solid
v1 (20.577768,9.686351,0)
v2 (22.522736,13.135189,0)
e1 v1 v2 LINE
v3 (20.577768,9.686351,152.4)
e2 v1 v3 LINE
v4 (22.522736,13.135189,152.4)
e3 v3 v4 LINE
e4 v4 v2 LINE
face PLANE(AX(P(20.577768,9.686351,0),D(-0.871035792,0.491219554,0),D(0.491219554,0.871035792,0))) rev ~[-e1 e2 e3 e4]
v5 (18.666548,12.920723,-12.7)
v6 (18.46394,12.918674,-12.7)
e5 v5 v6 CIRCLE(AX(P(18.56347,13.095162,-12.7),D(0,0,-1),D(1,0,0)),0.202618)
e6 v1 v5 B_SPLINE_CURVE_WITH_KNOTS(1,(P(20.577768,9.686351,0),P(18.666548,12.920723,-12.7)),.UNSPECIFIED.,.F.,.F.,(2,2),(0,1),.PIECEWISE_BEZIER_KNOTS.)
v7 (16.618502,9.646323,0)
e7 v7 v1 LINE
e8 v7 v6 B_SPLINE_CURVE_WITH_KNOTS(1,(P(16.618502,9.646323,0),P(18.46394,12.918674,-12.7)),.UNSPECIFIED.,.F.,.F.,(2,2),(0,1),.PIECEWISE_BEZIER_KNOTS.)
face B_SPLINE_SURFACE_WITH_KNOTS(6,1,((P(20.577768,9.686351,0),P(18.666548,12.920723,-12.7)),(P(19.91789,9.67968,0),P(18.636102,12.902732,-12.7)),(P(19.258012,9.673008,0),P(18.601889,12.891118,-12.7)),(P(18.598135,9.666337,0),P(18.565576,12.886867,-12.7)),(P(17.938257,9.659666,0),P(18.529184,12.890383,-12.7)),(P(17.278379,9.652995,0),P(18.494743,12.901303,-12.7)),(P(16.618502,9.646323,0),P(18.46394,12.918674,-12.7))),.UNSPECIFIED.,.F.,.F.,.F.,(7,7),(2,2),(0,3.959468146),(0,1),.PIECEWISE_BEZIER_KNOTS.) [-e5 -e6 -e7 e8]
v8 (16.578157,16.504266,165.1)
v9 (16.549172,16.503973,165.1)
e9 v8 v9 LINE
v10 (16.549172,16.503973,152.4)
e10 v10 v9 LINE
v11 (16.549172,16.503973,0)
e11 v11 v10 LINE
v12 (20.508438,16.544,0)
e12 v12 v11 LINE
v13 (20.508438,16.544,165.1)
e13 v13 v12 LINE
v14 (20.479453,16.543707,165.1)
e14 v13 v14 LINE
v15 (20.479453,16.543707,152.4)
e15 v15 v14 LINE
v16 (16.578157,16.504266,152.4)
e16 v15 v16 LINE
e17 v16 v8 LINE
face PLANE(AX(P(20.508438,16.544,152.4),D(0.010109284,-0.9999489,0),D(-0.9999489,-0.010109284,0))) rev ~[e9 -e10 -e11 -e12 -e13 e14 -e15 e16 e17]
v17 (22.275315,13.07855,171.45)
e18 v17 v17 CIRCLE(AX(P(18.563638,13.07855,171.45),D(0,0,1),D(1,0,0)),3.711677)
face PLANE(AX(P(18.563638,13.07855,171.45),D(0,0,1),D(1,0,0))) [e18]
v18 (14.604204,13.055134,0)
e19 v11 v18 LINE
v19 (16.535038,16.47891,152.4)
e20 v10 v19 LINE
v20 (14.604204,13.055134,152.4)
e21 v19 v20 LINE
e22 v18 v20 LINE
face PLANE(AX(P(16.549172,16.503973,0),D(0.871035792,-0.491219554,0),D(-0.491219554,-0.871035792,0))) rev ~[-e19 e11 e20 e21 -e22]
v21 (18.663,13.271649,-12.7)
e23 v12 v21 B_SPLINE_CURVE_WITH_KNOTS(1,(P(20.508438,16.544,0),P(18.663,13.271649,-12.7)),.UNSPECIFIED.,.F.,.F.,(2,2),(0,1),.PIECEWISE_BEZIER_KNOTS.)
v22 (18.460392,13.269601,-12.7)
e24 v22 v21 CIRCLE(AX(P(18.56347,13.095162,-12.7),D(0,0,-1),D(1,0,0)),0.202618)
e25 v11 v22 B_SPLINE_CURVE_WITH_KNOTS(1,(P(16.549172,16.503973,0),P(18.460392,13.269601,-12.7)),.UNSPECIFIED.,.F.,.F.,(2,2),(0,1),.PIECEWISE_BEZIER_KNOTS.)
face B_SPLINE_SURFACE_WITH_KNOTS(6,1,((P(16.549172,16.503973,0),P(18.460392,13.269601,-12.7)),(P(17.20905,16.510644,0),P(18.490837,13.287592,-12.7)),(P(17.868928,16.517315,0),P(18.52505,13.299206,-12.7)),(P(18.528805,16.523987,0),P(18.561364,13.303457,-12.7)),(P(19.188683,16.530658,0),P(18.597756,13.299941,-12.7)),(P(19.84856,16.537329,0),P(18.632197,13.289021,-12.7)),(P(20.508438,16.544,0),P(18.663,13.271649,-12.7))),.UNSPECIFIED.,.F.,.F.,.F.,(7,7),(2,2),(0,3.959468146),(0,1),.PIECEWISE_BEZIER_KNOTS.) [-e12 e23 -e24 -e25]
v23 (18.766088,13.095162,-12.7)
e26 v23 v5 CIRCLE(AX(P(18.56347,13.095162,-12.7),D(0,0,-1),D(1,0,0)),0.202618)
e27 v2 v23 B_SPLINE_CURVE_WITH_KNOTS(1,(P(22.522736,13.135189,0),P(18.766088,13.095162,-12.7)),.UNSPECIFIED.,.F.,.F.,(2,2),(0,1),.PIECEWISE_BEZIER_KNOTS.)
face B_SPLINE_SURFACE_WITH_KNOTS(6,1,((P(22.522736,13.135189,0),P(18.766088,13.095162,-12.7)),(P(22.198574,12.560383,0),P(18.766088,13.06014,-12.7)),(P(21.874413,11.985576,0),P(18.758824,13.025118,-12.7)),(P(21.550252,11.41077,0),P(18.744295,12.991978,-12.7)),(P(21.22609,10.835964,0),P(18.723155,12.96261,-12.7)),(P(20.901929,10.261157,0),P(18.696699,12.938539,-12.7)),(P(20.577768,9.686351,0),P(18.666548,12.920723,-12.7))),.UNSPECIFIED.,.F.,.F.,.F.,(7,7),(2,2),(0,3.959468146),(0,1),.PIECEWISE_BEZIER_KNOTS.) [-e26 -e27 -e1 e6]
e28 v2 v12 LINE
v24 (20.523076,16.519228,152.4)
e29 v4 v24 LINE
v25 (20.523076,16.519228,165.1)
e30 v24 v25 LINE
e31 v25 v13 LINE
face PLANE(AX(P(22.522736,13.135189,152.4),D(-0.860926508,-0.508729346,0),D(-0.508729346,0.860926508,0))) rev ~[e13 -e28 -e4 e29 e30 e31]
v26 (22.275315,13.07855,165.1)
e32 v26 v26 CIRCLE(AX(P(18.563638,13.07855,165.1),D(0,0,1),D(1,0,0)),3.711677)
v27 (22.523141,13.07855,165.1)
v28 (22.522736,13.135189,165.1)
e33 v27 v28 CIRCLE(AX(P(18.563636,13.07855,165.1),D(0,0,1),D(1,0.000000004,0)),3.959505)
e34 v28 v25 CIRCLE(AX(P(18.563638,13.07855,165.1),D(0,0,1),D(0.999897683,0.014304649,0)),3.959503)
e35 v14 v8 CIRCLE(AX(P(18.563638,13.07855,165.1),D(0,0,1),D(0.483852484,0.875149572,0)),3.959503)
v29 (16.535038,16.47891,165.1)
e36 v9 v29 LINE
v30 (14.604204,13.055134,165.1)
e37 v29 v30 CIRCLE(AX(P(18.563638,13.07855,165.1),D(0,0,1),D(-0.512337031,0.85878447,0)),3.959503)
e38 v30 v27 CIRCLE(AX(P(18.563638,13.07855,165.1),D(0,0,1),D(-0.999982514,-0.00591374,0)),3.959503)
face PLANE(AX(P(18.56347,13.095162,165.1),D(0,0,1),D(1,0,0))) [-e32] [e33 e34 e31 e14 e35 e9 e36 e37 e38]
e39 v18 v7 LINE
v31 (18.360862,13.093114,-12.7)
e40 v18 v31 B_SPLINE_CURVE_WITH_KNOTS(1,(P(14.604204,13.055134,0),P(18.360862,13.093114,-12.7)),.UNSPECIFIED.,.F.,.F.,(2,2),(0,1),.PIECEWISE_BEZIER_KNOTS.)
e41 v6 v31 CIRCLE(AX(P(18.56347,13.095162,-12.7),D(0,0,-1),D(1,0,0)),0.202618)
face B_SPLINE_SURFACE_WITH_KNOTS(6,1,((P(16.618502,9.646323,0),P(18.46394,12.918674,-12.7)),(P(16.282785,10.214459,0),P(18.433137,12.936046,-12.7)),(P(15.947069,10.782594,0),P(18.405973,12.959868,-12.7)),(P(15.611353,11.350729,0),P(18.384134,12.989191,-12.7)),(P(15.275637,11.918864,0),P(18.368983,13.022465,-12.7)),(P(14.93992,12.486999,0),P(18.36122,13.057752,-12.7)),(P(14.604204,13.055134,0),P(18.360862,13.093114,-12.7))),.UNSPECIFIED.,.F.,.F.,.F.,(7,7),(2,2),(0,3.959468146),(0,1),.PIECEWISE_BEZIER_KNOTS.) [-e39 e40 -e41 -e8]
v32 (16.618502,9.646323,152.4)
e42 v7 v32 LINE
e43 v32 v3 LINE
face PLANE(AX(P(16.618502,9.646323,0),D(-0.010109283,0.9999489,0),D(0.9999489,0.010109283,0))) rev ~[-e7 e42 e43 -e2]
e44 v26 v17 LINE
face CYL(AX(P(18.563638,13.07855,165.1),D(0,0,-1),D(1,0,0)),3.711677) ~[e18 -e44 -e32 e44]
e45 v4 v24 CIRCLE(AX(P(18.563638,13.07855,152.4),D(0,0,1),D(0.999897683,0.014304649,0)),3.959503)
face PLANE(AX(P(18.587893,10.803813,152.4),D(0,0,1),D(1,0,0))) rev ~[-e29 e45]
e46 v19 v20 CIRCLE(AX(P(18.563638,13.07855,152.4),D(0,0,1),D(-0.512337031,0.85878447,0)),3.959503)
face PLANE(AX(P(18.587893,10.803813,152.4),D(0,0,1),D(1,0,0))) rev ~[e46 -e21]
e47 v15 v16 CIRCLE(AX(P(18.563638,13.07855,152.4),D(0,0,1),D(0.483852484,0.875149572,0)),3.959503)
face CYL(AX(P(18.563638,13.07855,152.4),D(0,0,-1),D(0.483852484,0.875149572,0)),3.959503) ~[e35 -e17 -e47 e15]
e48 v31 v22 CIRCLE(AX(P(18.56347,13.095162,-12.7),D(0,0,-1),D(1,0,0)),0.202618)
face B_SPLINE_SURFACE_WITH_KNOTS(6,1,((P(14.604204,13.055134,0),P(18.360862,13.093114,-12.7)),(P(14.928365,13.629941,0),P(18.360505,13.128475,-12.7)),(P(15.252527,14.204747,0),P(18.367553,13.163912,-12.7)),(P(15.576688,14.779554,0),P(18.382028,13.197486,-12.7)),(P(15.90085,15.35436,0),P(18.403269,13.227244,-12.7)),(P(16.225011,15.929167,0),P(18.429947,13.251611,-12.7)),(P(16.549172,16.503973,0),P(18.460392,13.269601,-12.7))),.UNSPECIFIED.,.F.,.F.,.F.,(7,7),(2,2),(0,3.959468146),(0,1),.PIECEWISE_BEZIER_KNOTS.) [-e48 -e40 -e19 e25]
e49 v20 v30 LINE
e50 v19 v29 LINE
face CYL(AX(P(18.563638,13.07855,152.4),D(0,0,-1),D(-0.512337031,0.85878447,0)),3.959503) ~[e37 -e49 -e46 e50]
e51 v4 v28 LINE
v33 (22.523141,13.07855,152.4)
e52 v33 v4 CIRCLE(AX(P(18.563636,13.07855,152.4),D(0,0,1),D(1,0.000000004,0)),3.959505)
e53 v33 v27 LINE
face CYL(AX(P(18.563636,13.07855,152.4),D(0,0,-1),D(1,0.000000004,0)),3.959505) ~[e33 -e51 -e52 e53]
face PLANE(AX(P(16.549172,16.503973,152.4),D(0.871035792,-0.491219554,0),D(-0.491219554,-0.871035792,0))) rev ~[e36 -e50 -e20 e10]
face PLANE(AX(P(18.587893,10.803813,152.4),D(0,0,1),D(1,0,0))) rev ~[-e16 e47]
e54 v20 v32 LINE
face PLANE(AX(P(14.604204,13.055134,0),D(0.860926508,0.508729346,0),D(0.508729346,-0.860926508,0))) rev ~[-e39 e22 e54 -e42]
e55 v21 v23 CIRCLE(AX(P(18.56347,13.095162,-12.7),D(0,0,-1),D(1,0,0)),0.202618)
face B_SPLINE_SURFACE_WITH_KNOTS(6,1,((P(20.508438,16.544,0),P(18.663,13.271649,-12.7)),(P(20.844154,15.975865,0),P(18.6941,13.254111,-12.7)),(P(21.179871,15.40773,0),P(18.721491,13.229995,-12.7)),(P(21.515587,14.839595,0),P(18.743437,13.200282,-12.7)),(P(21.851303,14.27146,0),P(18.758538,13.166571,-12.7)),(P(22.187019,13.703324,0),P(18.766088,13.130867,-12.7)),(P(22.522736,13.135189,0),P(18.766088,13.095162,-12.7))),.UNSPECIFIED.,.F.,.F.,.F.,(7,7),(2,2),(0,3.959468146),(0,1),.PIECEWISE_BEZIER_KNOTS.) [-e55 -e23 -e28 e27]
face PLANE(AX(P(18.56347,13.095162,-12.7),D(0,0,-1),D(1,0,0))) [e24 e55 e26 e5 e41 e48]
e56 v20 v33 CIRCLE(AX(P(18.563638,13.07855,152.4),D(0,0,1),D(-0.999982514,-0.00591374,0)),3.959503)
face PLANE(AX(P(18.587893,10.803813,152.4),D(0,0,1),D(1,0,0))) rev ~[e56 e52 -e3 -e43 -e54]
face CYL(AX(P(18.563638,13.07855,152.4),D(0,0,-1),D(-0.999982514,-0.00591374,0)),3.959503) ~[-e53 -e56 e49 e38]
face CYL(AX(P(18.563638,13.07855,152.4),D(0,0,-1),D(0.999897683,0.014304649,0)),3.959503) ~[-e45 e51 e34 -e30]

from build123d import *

# Parameters (mm, degrees)
F1_DEPTH = 152.4
F3_DEPTH = 12.7
F4_R     = 3.7116770234
F5_DEPTH = 6.35
F7_R     = 0.2026181046


with BuildPart() as f1:
    # F0 (on Top) → F1 (new body)
    with BuildSketch(Plane.XY):
        Polygon((22.5227356887, 13.1351892635), (20.5084380472, 16.5440003483), (16.5491722304, 16.5039729623), (14.604204055, 13.0551344916), (16.6185016965, 9.6463234069), (20.5777675134, 9.6863507928), align=None)
    extrude(amount=F1_DEPTH)

    # F1_face (on face) + F1_face1 (on face) + F2 (on face) → F3 (join)
    with BuildSketch(Plane(origin=(18.5634698719, 13.0951618776, 152.4), x_dir=(1, 0, 0), z_dir=(0, 0, 1))):
        Polygon((3.9592658168, 0.0400273859), (1.9449681753, 3.4488384707), (-2.0142976415, 3.4088110847), (-3.9592658168, -0.0400273859), (-1.9449681753, -3.4488384707), (2.0142976415, -3.4088110847), align=None)
    with BuildSketch(Plane(origin=(18.5634698719, 13.0951618776, 0), x_dir=(1, 0, 0), z_dir=(0, 0, -1))):
        Polygon((1.9449681753, -3.4488384707), (3.9592658168, -0.0400273859), (2.0142976415, 3.4088110847), (-1.9449681753, 3.4488384707), (-3.9592658168, 0.0400273859), (-2.0142976415, -3.4088110847), align=None)
    with BuildSketch(Plane.XY.offset(152.4)):
        with BuildLine():
            ThreePointArc((14.604204055, 13.0551344916), (18.5753456023, 9.1190642761), (22.5231408121, 13.0785499639))
            ThreePointArc((22.5231408121, 13.0785499639), (22.5230395299, 13.1068703381), (22.5227356887, 13.1351892635))
            Line((22.5227356887, 13.1351892635), (20.5777675134, 9.6863507928))
            Line((20.5777675134, 9.6863507928), (16.6185016965, 9.6463234069))
            Line((16.6185016965, 9.6463234069), (14.604204055, 13.0551344916))
        make_face()
        with BuildLine():
            Line((20.5230763012, 16.5192279208), (22.5227356887, 13.1351892635))
            ThreePointArc((22.5227356887, 13.1351892635), (21.9724789039, 15.0928653351), (20.5230763012, 16.5192279208))
        make_face()
        with BuildLine():
            Line((20.5777675134, 9.6863507928), (22.5227356887, 13.1351892635))
            Line((22.5227356887, 13.1351892635), (20.5230763012, 16.5192279208))
            ThreePointArc((20.5230763012, 16.5192279208), (20.501303397, 16.5315365084), (20.4794531772, 16.543707317))
            Line((20.4794531772, 16.543707317), (16.5781571004, 16.5042659936))
            ThreePointArc((16.5781571004, 16.5042659936), (16.5565574105, 16.491655915), (16.5350378058, 16.4789096488))
            Line((16.5350378058, 16.4789096488), (14.604204055, 13.0551344916))
            Line((14.604204055, 13.0551344916), (16.6185016965, 9.6463234069))
            Line((16.6185016965, 9.6463234069), (20.5777675134, 9.6863507928))
        make_face()
        with BuildLine():
            ThreePointArc((16.5350378058, 16.4789096488), (15.1147689879, 15.0235352587), (14.604204055, 13.0551344916))
            Line((14.604204055, 13.0551344916), (16.5350378058, 16.4789096488))
        make_face()
        with BuildLine():
            Line((16.5781571004, 16.5042659936), (20.4794531772, 16.543707317))
            ThreePointArc((20.4794531772, 16.543707317), (18.5236100767, 17.0378506299), (16.5781571004, 16.5042659936))
        make_face()
    extrude(amount=F3_DEPTH, dir=(0, 0, 1))

    # F4 (on face) → F5 (join)
    with BuildSketch(Plane.XY.offset(165.1)):
        with Locations((18.563637815, 13.0785499639)):
            Circle(F4_R)
    extrude(amount=F5_DEPTH)

    # F1_face1 (on face) → F8 section 0
    with BuildSketch(Plane(origin=(18.5634698719, 13.0951618776, 0), x_dir=(1, 0, 0), z_dir=(0, 0, -1))):
        Polygon((1.9449681753, -3.4488384707), (3.9592658168, -0.0400273859), (2.0142976415, 3.4088110847), (-1.9449681753, 3.4488384707), (-3.9592658168, 0.0400273859), (-2.0142976415, -3.4088110847), align=None)
    # F7 (on offset) → F8 section 1
    with BuildSketch(Plane(origin=(0, 0, -12.7), x_dir=(1, 0, 0), z_dir=(0, 0, -1))):
        with Locations((18.5634698719, -13.0951618776)):
            Circle(F7_R)
    loft()


solid = f1.part
